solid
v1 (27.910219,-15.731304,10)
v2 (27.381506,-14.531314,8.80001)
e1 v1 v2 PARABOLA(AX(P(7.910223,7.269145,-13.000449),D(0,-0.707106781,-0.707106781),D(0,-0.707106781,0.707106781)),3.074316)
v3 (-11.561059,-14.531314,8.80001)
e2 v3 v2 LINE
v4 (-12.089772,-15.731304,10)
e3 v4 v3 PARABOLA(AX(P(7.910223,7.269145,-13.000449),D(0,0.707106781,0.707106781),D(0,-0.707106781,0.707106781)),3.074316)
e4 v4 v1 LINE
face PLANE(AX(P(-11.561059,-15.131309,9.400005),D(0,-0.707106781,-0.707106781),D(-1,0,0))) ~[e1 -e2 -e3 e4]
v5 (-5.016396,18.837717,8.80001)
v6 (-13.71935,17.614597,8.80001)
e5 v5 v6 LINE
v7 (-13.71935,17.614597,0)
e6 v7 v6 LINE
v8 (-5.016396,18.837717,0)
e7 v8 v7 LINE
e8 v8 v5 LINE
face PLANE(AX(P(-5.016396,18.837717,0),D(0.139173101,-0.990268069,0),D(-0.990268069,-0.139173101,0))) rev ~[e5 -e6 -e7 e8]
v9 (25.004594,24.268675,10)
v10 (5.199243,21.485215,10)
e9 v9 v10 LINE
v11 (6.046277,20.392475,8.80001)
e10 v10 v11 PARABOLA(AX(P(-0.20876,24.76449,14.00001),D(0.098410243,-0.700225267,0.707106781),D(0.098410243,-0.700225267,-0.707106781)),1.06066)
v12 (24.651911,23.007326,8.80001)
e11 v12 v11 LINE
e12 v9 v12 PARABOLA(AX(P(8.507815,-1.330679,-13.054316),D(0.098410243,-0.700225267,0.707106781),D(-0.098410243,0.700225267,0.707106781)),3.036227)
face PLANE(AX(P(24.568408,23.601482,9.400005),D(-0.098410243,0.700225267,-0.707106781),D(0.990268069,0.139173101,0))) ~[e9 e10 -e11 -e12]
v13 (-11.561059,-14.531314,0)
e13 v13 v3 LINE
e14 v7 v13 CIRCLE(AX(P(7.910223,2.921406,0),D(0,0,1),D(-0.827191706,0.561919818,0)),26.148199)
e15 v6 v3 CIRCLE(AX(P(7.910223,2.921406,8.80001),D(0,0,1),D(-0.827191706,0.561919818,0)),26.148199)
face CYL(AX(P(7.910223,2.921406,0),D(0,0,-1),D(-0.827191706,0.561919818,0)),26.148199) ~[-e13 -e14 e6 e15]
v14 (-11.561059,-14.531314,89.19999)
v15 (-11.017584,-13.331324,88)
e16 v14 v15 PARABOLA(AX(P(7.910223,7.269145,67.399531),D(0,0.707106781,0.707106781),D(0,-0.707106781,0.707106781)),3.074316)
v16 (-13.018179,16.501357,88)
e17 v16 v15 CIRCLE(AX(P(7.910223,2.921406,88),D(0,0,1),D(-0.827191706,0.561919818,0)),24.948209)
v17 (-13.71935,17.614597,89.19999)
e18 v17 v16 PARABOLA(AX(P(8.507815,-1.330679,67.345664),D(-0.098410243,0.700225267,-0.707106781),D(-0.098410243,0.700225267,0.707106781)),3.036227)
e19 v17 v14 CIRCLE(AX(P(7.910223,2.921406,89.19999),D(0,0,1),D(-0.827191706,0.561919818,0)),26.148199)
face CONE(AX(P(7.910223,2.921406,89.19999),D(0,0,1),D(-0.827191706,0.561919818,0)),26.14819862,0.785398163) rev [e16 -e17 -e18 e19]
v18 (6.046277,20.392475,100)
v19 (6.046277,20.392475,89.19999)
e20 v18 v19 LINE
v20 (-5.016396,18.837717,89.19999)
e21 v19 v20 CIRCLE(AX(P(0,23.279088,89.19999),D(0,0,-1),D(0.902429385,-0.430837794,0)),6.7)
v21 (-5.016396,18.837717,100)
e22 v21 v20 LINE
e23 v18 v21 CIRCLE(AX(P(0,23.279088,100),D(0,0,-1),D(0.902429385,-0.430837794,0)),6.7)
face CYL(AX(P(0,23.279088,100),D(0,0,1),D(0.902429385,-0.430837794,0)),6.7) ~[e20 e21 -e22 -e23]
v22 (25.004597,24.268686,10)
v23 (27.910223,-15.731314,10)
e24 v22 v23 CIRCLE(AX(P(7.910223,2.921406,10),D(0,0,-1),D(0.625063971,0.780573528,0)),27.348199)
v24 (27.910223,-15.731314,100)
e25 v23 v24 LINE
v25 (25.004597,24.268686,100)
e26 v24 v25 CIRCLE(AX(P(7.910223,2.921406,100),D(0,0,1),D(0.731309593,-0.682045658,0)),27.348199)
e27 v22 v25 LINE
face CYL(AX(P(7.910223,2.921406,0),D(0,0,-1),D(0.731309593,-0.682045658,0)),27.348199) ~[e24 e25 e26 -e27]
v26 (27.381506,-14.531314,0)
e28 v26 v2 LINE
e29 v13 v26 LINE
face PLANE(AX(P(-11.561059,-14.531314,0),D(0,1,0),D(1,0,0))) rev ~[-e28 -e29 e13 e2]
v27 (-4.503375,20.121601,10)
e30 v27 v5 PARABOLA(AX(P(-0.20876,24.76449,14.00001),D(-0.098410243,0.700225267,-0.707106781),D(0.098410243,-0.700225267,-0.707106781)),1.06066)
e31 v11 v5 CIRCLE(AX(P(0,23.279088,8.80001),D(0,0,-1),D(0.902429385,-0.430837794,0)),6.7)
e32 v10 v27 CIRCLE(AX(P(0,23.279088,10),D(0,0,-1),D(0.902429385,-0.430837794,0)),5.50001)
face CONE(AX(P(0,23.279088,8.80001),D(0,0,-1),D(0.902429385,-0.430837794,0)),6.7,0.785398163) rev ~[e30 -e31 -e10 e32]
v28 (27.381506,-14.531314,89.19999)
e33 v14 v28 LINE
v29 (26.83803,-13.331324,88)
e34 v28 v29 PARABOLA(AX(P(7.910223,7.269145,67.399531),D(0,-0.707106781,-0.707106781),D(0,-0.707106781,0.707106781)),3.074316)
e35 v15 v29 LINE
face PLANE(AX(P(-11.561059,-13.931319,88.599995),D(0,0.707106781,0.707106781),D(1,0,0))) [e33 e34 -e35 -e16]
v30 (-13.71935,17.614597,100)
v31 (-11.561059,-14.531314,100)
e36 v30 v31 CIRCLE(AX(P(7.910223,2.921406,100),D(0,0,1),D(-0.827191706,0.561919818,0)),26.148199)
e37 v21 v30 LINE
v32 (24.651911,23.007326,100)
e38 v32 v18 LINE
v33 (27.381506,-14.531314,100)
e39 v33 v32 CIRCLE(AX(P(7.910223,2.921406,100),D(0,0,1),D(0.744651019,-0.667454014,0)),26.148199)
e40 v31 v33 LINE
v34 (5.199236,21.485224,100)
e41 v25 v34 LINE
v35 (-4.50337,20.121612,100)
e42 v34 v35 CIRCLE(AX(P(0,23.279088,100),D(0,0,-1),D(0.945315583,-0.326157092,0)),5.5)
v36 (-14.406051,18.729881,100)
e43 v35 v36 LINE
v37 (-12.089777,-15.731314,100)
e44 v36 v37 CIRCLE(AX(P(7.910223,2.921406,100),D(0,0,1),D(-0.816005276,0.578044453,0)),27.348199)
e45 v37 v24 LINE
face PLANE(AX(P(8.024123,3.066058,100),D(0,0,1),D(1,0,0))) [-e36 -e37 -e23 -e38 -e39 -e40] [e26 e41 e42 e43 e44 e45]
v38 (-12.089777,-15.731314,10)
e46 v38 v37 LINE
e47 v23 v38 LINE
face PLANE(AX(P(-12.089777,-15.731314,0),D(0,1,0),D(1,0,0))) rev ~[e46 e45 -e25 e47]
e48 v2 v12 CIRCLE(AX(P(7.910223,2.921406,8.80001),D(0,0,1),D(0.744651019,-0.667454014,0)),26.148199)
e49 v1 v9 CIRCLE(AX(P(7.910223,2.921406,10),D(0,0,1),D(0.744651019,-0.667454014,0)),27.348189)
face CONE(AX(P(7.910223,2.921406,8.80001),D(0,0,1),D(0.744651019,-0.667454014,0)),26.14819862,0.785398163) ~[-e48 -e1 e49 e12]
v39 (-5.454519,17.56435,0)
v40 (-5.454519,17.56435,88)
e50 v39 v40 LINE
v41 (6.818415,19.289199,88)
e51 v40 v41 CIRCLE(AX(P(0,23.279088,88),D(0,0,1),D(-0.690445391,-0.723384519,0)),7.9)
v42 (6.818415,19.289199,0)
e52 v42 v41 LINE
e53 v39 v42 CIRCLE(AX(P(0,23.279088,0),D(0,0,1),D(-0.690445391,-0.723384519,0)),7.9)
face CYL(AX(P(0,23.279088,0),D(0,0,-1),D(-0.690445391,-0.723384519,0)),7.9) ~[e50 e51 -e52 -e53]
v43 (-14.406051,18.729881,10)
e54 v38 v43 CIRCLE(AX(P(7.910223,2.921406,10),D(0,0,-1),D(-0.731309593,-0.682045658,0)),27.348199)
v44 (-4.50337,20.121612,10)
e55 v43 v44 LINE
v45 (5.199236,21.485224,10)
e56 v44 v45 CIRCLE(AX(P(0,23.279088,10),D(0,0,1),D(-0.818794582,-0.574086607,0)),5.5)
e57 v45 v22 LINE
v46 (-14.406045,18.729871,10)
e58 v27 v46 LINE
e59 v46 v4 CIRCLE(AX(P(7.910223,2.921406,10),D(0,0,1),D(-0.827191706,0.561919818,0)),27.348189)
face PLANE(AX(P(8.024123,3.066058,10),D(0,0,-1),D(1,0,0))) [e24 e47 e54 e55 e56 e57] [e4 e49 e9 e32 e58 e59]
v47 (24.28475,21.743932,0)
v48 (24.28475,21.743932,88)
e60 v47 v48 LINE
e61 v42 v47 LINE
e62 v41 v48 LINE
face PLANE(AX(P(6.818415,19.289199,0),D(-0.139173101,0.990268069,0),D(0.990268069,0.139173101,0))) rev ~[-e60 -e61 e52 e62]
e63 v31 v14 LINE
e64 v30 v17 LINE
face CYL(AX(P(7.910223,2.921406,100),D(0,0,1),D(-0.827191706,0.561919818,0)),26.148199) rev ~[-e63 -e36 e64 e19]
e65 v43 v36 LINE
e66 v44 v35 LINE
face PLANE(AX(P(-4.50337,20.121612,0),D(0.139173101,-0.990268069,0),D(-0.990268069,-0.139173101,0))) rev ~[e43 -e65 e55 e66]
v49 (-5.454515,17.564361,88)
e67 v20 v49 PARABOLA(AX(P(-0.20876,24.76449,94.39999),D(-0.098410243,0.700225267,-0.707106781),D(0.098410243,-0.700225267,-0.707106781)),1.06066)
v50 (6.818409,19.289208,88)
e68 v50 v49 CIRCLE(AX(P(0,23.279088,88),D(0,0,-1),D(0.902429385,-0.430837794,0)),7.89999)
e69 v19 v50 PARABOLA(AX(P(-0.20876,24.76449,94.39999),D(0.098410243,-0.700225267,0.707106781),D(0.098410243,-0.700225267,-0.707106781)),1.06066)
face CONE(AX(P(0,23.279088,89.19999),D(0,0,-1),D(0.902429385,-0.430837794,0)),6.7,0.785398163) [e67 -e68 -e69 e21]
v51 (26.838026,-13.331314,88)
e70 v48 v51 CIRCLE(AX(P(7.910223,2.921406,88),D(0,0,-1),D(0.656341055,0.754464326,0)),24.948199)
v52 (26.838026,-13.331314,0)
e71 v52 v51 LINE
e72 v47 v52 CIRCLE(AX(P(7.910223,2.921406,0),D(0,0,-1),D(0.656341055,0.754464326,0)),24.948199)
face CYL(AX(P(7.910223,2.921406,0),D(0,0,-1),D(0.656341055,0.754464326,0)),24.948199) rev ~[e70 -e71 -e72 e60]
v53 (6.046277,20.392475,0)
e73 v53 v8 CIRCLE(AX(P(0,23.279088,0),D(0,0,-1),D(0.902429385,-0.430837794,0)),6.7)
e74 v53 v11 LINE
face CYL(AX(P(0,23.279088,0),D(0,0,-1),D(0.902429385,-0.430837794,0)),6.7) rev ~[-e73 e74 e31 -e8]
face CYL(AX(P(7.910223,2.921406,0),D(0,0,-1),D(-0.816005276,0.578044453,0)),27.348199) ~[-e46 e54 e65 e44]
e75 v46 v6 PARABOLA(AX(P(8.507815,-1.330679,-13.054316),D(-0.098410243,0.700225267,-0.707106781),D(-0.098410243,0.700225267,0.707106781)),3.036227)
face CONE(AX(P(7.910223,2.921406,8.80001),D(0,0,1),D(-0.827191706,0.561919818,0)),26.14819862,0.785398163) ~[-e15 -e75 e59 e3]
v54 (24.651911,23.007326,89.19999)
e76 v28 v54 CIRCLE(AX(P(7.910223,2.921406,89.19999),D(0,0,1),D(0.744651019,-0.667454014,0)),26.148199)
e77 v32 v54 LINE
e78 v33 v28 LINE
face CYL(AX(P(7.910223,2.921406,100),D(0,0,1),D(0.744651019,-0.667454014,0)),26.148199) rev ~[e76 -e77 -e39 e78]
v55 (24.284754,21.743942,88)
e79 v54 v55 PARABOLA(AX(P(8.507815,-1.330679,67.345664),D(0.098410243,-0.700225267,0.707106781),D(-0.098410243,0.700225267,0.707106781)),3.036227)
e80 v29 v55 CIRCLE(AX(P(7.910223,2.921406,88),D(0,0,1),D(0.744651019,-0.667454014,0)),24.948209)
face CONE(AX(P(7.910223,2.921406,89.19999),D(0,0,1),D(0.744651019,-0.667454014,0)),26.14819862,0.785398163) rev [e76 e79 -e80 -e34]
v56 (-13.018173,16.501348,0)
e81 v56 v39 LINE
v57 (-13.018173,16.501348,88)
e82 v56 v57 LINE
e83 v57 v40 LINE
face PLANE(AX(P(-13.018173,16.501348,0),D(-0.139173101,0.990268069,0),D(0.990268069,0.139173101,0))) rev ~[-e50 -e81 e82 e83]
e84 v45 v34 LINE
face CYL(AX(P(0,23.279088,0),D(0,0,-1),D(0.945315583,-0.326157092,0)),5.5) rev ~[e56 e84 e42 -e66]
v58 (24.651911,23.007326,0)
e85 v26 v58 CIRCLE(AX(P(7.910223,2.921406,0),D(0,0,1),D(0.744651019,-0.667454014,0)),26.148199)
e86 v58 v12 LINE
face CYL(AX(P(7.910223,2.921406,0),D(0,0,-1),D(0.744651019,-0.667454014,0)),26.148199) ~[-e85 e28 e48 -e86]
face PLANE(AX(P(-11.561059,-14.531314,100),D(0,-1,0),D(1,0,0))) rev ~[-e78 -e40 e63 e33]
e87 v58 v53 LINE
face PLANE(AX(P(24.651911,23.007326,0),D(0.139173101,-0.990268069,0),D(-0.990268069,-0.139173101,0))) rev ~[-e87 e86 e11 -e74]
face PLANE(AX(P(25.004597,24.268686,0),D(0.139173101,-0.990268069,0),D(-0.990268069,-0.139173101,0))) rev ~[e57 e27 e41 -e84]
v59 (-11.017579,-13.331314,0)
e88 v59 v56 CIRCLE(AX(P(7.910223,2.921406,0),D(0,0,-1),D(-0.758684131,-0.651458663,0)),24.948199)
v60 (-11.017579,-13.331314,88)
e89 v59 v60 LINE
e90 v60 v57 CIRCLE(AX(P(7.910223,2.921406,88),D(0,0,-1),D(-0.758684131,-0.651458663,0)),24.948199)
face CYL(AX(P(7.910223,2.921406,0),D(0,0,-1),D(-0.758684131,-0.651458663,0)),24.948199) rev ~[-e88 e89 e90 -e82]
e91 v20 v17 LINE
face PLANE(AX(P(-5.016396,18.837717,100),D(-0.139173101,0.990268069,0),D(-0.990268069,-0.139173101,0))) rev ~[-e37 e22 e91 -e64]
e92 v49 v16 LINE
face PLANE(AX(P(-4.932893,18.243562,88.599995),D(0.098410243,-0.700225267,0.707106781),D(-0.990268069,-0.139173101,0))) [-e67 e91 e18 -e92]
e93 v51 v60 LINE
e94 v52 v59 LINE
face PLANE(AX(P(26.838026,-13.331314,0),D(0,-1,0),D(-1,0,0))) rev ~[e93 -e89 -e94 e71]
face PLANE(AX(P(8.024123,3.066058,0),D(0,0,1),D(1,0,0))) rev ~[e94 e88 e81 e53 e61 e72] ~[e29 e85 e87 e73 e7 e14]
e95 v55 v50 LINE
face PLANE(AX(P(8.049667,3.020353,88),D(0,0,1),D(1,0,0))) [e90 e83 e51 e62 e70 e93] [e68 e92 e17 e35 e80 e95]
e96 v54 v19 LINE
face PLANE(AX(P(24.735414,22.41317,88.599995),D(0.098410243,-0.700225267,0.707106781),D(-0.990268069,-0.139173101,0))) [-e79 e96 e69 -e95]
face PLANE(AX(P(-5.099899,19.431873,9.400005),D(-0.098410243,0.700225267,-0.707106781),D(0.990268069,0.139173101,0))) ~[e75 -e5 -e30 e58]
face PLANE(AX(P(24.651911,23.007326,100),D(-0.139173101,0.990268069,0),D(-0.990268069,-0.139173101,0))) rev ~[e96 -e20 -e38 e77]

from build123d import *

# Parameters (mm, degrees)
F1_DEPTH = 100
F3_DEPTH = 10
F5_DEPTH = 12
F6_SIZE  = 1.19999


# Not quite as in the source:
# - a fillet or chamfer is up to 0.001 mm smaller than in the source, because OpenCascade refuses the exact size


with BuildPart() as f1:
    # F0 (on Top) → F1 (new body)
    with BuildSketch(Plane.XY):
        with BuildLine():
            Line((-12.0897765349, -15.731314094), (27.9102234651, -15.731314094))
            ThreePointArc((27.9102234651, -15.731314094), (35.186552736, 4.9027765722), (25.0045970812, 24.268685906))
            Line((25.0045970812, 24.268685906), (5.1992357064, 21.4852238868))
            ThreePointArc((5.1992357064, 21.4852238868), (0.7654520553, 17.832613514), (-4.5033702016, 20.1216115537))
            Line((-4.5033702016, 20.1216115537), (-14.406050889, 18.7298805441))
            ThreePointArc((-14.406050889, 18.7298805441), (-19.3764079278, 1.0873626828), (-12.0897765349, -15.731314094))
        make_face()
        with BuildLine():
            ThreePointArc((-11.0175789214, -13.331314094), (-16.9820661814, 1.2521155975), (-13.0181733872, 16.5013478326))
            Line((-13.0181733872, 16.5013478326), (-5.4545185869, 17.5643501916))
            ThreePointArc((-5.4545185869, 17.5643501916), (1.0994674976, 15.455970149), (6.8184149763, 19.2891985189))
            Line((6.8184149763, 19.2891985189), (24.284750464, 21.7439318875))
            ThreePointArc((24.284750464, 21.7439318875), (32.7925833849, 4.7326981573), (26.8380258517, -13.331314094))
            Line((26.8380258517, -13.331314094), (-11.0175789214, -13.331314094))
        make_face(mode=Mode.SUBTRACT)
    extrude(amount=F1_DEPTH)

    # F2 (on face) → F3 (cut)
    with BuildSketch(Plane(origin=(0, 0, 0), x_dir=(1, 0, 0), z_dir=(0, 0, -1))):
        with BuildLine():
            Line((27.9102234651, 15.731314094), (-12.0897765349, 15.731314094))
            ThreePointArc((-12.0897765349, 15.731314094), (-19.3764079278, -1.0873626828), (-14.406050889, -18.7298805441))
            Line((-14.406050889, -18.7298805441), (-4.5033702016, -20.1216115537))
            ThreePointArc((-4.5033702016, -20.1216115537), (0.7654520553, -17.832613514), (5.1992357064, -21.4852238868))
            Line((5.1992357064, -21.4852238868), (25.0045970812, -24.268685906))
            ThreePointArc((25.0045970812, -24.268685906), (35.186552736, -4.9027765722), (27.9102234651, 15.731314094))
        make_face()
        with BuildLine():
            ThreePointArc((6.0462768814, -20.3924746735), (0.9324597764, -16.6442918315), (-5.0163959343, -18.837717402))
            Line((-5.0163959343, -18.837717402), (-13.7193495518, -17.6145970362))
            ThreePointArc((-13.7193495518, -17.6145970362), (-18.1792377522, -1.1697483945), (-11.5610592762, 14.531314094))
            Line((-11.5610592762, 14.531314094), (27.3815062065, 14.531314094))
            ThreePointArc((27.3815062065, 14.531314094), (33.9895674633, -4.8177466261), (24.6519111864, -23.0073260489))
            Line((24.6519111864, -23.0073260489), (6.0462768814, -20.3924746735))
        make_face(mode=Mode.SUBTRACT)
    extrude(amount=-F3_DEPTH, mode=Mode.SUBTRACT)

    # F4 (on face) → F5 (cut)
    with BuildSketch(Plane.XY.offset(100)):
        with BuildLine():
            Line((-5.0163959343, 18.837717402), (-13.7193495518, 17.6145970362))
            ThreePointArc((-13.7193495518, 17.6145970362), (-18.1792377522, 1.1697483945), (-11.5610592762, -14.531314094))
            Line((-11.5610592762, -14.531314094), (27.3815062065, -14.531314094))
            ThreePointArc((27.3815062065, -14.531314094), (33.9895674633, 4.8177466261), (24.6519111864, 23.0073260489))
            Line((24.6519111864, 23.0073260489), (6.0462768814, 20.3924746735))
            ThreePointArc((6.0462768814, 20.3924746735), (0.9324597764, 16.6442918315), (-5.0163959343, 18.837717402))
        make_face()
        with BuildLine():
            ThreePointArc((24.284750464, 21.7439318875), (32.7925833849, 4.7326981573), (26.8380258517, -13.331314094))
            Line((26.8380258517, -13.331314094), (-11.0175789214, -13.331314094))
            ThreePointArc((-11.0175789214, -13.331314094), (-16.9820661814, 1.2521155975), (-13.0181733872, 16.5013478326))
            Line((-13.0181733872, 16.5013478326), (-5.4545185869, 17.5643501916))
            ThreePointArc((-5.4545185869, 17.5643501916), (1.0994674976, 15.455970149), (6.8184149763, 19.2891985189))
            Line((6.8184149763, 19.2891985189), (24.284750464, 21.7439318875))
        make_face(mode=Mode.SUBTRACT)
    extrude(amount=-F5_DEPTH, mode=Mode.SUBTRACT)

    # F6 (size 1.2 in the source; OpenCascade refuses exactly that, so slightly less here)
    f6_edges = [f1.edges().sort_by_distance(p)[0] for p in [
        (15.349094, 21.6999, 10),
        (33.989567, 4.817747, 10),
        (0.93246, 16.644292, 10),
        (-9.367873, 18.226157, 10),
        (-18.179238, 1.169748, 10),
        (7.910223, -14.531314, 10),
        (-18.179238, 1.169748, 88),
        (-9.367873, 18.226157, 88),
        (0.93246, 16.644292, 88),
        (15.349094, 21.6999, 88),
        (7.910223, -14.531314, 88),
        (33.989567, 4.817747, 88),
    ]]
    chamfer(f6_edges, length=F6_SIZE)


solid = f1.part
